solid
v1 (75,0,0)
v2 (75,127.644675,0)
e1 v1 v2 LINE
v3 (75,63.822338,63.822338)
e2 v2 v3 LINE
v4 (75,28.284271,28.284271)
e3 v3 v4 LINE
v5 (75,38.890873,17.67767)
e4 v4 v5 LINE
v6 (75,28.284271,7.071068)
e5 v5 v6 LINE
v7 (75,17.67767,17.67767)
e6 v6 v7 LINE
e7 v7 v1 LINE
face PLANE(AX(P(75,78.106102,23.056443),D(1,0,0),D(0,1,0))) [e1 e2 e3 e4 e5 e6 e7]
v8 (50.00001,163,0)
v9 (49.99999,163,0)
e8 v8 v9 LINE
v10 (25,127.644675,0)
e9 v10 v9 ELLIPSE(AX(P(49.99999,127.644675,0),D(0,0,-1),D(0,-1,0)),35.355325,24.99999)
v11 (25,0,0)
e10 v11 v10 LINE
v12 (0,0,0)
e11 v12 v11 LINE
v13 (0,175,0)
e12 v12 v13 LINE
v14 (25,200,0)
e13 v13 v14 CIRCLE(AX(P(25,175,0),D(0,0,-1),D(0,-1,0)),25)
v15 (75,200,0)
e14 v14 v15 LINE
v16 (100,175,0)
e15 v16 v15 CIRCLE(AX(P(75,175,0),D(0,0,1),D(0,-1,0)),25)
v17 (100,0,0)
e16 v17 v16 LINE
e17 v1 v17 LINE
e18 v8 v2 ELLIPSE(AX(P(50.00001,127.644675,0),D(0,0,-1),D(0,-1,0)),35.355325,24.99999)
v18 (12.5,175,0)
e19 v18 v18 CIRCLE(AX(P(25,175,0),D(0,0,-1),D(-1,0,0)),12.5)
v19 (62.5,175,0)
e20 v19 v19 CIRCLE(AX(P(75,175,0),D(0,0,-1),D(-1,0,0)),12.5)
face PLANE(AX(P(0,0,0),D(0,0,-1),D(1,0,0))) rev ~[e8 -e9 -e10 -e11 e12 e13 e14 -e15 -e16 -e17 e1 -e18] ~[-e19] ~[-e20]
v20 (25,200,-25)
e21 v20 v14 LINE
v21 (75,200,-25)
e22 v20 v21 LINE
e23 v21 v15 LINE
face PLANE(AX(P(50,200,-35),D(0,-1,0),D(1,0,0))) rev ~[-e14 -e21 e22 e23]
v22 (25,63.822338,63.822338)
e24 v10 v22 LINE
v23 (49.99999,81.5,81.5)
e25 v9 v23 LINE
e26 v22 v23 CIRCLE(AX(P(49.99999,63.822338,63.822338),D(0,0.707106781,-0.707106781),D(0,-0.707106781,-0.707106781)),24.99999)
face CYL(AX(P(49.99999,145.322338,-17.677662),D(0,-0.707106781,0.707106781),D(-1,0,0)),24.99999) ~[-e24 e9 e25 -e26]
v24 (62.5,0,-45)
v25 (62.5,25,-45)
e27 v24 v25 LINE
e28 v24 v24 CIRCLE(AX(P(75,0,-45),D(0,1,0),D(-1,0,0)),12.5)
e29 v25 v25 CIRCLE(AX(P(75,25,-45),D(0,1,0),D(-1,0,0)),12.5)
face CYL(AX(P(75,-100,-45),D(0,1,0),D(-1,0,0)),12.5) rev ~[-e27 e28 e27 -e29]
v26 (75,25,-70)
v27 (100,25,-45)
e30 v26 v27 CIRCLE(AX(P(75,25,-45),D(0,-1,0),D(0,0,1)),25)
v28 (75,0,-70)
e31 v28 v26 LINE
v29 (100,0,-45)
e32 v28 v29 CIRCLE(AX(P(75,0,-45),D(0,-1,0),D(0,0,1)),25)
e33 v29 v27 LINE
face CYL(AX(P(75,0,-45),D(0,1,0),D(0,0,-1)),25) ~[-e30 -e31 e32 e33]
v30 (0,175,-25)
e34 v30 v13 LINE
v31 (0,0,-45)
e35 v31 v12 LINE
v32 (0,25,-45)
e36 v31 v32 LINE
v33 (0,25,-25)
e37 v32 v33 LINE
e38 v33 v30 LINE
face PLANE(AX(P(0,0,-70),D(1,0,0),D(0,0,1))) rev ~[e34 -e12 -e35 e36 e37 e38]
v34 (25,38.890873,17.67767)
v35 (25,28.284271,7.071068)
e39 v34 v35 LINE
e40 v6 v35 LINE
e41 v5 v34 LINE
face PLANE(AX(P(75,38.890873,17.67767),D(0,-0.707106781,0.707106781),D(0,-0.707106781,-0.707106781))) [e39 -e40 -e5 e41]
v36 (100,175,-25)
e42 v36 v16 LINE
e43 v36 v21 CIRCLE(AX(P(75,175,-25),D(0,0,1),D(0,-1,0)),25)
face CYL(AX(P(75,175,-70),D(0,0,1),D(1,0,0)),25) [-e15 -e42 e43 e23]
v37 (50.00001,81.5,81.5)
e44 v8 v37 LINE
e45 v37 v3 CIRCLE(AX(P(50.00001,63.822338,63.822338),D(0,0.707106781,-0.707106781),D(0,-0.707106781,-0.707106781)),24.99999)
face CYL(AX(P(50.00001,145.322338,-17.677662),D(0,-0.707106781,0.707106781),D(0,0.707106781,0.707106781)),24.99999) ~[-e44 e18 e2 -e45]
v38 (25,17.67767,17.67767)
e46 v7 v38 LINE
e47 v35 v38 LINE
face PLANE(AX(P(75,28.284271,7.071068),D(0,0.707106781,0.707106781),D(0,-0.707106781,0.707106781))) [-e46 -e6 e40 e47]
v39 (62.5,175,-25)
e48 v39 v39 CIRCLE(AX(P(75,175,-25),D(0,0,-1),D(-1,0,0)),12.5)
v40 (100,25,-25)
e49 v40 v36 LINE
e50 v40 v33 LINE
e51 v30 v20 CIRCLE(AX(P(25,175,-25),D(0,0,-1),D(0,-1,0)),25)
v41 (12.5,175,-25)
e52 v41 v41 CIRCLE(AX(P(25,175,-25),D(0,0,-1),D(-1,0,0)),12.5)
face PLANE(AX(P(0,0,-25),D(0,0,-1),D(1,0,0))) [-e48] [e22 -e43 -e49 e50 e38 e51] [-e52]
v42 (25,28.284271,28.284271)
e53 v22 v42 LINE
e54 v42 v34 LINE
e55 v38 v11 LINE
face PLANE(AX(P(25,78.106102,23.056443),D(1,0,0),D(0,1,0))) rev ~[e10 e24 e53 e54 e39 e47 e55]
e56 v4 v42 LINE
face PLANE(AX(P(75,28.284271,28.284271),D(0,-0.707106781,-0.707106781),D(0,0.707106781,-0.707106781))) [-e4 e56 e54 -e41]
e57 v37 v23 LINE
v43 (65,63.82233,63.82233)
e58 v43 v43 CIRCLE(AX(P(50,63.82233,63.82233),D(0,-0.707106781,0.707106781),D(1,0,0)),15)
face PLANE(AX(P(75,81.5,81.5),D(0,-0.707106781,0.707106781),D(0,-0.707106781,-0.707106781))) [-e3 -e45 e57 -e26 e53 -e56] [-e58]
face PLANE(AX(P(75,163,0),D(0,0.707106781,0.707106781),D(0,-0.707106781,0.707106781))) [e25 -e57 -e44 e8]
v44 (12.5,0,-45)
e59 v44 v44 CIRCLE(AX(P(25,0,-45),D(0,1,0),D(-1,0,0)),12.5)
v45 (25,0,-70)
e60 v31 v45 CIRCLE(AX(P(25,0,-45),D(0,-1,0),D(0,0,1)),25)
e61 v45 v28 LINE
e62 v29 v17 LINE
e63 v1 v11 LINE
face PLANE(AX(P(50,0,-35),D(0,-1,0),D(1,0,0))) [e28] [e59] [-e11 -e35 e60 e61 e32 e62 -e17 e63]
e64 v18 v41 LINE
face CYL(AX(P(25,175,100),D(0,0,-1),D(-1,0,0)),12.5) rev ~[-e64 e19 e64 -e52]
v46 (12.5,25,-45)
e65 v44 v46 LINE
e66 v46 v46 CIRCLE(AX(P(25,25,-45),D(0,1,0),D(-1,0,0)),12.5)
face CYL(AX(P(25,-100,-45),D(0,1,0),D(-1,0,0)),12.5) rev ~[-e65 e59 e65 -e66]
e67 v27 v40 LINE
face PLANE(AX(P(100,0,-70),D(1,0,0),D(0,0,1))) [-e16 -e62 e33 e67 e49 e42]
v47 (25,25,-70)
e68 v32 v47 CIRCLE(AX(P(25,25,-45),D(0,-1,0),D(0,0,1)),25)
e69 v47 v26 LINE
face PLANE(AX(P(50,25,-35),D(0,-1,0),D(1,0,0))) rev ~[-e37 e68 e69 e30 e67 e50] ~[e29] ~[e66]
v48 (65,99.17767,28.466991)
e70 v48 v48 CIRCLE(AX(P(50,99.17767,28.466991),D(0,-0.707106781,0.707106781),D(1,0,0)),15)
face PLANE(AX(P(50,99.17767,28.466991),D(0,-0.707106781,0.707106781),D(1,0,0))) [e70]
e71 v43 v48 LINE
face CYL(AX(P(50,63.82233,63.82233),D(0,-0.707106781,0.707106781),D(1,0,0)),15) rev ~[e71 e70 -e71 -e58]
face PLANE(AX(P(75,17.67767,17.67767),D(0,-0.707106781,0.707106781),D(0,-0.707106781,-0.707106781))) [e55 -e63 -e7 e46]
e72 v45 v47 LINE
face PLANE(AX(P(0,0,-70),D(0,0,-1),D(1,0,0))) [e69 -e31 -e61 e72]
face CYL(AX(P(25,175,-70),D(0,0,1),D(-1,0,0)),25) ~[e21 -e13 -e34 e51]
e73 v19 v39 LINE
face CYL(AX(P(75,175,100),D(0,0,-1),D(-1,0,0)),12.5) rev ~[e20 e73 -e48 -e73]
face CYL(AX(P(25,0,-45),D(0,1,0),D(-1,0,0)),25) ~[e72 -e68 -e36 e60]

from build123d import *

# Parameters (mm, degrees)
F0_W           = 100
F0_H           = 70
F1_DEPTH       = 200
F2_R           = 25
F3_T           = -25
F5_START       = -25
F5_DEPTH       = 50
F6_R           = 24.99999
F9_D           = 25
F9_DEPTH       = 100
F9_TIP         = 7.5107577378
F9_ON_F8_D     = 25
F9_ON_F8_DEPTH = 100
F9_ON_F8_TIP   = 7.5107577378
F10_R          = 15
F11_DEPTH      = 50


# Not quite as in the source:
# - a fillet or chamfer is up to 0.001 mm smaller than in the source, because OpenCascade refuses the exact size


with BuildPart() as f1:
    # F0 (on Front) → F1 (new body)
    with BuildSketch(Plane.XZ):
        with Locations((50, -35)):
            Rectangle(F0_W, F0_H)
    extrude(amount=-F1_DEPTH)

    # F2
    f2_edges = [f1.edges().sort_by_distance(p)[0] for p in [
        (100, 100, -70),
        (0, 100, -70),
        (100, 200, -35),
        (0, 200, -35),
    ]]
    fillet(f2_edges, radius=F2_R)

    # F3
    f3_openings = [f1.faces().sort_by_distance(p)[0] for p in [
        (100, 87.5, -22.5),
        (50, 200, -35),
        (92.67767, 192.67767, -35),
        (7.32233, 192.67767, -35),
        (0, 87.5, -22.5),
        (92.67767, 100, -62.67767),
        (50, 100, -70),
        (7.32233, 100, -62.67767),
    ]]
    offset(amount=F3_T, openings=f3_openings)

    # F4 (on face) → F5 (join)
    with BuildSketch(Plane.YZ.offset(100).offset(F5_START)):
        Polygon((17.6776695297, 17.6776695297), (0, 0), (163, 0), (81.5, 81.5), (28.2842712475, 28.2842712475), (38.8908729653, 17.6776695297), (28.2842712475, 7.0710678119), align=None)
    extrude(amount=-F5_DEPTH)

    # F6 (radius 25 in the source; OpenCascade refuses exactly that, so slightly less here)
    f6_edges = [f1.edges().sort_by_distance(p)[0] for p in [
        (75, 122.25, 40.75),
        (25, 122.25, 40.75),
    ]]
    fillet(f6_edges, radius=F6_R)

    # F9
    with Locations(Plane.XZ):
        with Locations((75, -45), (25, -45)):
            Hole(F9_D / 2, depth=F9_DEPTH)
            with Locations((0, 0, -(F9_DEPTH + F9_TIP / 2))):  # 118° drill point
                Cone(0, F9_D / 2, F9_TIP, mode=Mode.SUBTRACT)

    # F9 on F8
    with Locations(Plane.XY):
        with Locations((75, 175), (25, 175)):
            Hole(F9_ON_F8_D / 2, depth=F9_ON_F8_DEPTH)
            with Locations((0, 0, -(F9_ON_F8_DEPTH + F9_ON_F8_TIP / 2))):  # 118° drill point
                Cone(0, F9_ON_F8_D / 2, F9_ON_F8_TIP, mode=Mode.SUBTRACT)

    # F10 (on face) → F11 (cut)
    with BuildSketch(Plane(origin=(0, 0, 0), x_dir=(1, 0, 0), z_dir=(0, -0.7071067812, 0.7071067812))):
        with Locations((50, 90.2584053334)):
            Circle(F10_R)
    extrude(amount=-F11_DEPTH, mode=Mode.SUBTRACT)


solid = f1.part
